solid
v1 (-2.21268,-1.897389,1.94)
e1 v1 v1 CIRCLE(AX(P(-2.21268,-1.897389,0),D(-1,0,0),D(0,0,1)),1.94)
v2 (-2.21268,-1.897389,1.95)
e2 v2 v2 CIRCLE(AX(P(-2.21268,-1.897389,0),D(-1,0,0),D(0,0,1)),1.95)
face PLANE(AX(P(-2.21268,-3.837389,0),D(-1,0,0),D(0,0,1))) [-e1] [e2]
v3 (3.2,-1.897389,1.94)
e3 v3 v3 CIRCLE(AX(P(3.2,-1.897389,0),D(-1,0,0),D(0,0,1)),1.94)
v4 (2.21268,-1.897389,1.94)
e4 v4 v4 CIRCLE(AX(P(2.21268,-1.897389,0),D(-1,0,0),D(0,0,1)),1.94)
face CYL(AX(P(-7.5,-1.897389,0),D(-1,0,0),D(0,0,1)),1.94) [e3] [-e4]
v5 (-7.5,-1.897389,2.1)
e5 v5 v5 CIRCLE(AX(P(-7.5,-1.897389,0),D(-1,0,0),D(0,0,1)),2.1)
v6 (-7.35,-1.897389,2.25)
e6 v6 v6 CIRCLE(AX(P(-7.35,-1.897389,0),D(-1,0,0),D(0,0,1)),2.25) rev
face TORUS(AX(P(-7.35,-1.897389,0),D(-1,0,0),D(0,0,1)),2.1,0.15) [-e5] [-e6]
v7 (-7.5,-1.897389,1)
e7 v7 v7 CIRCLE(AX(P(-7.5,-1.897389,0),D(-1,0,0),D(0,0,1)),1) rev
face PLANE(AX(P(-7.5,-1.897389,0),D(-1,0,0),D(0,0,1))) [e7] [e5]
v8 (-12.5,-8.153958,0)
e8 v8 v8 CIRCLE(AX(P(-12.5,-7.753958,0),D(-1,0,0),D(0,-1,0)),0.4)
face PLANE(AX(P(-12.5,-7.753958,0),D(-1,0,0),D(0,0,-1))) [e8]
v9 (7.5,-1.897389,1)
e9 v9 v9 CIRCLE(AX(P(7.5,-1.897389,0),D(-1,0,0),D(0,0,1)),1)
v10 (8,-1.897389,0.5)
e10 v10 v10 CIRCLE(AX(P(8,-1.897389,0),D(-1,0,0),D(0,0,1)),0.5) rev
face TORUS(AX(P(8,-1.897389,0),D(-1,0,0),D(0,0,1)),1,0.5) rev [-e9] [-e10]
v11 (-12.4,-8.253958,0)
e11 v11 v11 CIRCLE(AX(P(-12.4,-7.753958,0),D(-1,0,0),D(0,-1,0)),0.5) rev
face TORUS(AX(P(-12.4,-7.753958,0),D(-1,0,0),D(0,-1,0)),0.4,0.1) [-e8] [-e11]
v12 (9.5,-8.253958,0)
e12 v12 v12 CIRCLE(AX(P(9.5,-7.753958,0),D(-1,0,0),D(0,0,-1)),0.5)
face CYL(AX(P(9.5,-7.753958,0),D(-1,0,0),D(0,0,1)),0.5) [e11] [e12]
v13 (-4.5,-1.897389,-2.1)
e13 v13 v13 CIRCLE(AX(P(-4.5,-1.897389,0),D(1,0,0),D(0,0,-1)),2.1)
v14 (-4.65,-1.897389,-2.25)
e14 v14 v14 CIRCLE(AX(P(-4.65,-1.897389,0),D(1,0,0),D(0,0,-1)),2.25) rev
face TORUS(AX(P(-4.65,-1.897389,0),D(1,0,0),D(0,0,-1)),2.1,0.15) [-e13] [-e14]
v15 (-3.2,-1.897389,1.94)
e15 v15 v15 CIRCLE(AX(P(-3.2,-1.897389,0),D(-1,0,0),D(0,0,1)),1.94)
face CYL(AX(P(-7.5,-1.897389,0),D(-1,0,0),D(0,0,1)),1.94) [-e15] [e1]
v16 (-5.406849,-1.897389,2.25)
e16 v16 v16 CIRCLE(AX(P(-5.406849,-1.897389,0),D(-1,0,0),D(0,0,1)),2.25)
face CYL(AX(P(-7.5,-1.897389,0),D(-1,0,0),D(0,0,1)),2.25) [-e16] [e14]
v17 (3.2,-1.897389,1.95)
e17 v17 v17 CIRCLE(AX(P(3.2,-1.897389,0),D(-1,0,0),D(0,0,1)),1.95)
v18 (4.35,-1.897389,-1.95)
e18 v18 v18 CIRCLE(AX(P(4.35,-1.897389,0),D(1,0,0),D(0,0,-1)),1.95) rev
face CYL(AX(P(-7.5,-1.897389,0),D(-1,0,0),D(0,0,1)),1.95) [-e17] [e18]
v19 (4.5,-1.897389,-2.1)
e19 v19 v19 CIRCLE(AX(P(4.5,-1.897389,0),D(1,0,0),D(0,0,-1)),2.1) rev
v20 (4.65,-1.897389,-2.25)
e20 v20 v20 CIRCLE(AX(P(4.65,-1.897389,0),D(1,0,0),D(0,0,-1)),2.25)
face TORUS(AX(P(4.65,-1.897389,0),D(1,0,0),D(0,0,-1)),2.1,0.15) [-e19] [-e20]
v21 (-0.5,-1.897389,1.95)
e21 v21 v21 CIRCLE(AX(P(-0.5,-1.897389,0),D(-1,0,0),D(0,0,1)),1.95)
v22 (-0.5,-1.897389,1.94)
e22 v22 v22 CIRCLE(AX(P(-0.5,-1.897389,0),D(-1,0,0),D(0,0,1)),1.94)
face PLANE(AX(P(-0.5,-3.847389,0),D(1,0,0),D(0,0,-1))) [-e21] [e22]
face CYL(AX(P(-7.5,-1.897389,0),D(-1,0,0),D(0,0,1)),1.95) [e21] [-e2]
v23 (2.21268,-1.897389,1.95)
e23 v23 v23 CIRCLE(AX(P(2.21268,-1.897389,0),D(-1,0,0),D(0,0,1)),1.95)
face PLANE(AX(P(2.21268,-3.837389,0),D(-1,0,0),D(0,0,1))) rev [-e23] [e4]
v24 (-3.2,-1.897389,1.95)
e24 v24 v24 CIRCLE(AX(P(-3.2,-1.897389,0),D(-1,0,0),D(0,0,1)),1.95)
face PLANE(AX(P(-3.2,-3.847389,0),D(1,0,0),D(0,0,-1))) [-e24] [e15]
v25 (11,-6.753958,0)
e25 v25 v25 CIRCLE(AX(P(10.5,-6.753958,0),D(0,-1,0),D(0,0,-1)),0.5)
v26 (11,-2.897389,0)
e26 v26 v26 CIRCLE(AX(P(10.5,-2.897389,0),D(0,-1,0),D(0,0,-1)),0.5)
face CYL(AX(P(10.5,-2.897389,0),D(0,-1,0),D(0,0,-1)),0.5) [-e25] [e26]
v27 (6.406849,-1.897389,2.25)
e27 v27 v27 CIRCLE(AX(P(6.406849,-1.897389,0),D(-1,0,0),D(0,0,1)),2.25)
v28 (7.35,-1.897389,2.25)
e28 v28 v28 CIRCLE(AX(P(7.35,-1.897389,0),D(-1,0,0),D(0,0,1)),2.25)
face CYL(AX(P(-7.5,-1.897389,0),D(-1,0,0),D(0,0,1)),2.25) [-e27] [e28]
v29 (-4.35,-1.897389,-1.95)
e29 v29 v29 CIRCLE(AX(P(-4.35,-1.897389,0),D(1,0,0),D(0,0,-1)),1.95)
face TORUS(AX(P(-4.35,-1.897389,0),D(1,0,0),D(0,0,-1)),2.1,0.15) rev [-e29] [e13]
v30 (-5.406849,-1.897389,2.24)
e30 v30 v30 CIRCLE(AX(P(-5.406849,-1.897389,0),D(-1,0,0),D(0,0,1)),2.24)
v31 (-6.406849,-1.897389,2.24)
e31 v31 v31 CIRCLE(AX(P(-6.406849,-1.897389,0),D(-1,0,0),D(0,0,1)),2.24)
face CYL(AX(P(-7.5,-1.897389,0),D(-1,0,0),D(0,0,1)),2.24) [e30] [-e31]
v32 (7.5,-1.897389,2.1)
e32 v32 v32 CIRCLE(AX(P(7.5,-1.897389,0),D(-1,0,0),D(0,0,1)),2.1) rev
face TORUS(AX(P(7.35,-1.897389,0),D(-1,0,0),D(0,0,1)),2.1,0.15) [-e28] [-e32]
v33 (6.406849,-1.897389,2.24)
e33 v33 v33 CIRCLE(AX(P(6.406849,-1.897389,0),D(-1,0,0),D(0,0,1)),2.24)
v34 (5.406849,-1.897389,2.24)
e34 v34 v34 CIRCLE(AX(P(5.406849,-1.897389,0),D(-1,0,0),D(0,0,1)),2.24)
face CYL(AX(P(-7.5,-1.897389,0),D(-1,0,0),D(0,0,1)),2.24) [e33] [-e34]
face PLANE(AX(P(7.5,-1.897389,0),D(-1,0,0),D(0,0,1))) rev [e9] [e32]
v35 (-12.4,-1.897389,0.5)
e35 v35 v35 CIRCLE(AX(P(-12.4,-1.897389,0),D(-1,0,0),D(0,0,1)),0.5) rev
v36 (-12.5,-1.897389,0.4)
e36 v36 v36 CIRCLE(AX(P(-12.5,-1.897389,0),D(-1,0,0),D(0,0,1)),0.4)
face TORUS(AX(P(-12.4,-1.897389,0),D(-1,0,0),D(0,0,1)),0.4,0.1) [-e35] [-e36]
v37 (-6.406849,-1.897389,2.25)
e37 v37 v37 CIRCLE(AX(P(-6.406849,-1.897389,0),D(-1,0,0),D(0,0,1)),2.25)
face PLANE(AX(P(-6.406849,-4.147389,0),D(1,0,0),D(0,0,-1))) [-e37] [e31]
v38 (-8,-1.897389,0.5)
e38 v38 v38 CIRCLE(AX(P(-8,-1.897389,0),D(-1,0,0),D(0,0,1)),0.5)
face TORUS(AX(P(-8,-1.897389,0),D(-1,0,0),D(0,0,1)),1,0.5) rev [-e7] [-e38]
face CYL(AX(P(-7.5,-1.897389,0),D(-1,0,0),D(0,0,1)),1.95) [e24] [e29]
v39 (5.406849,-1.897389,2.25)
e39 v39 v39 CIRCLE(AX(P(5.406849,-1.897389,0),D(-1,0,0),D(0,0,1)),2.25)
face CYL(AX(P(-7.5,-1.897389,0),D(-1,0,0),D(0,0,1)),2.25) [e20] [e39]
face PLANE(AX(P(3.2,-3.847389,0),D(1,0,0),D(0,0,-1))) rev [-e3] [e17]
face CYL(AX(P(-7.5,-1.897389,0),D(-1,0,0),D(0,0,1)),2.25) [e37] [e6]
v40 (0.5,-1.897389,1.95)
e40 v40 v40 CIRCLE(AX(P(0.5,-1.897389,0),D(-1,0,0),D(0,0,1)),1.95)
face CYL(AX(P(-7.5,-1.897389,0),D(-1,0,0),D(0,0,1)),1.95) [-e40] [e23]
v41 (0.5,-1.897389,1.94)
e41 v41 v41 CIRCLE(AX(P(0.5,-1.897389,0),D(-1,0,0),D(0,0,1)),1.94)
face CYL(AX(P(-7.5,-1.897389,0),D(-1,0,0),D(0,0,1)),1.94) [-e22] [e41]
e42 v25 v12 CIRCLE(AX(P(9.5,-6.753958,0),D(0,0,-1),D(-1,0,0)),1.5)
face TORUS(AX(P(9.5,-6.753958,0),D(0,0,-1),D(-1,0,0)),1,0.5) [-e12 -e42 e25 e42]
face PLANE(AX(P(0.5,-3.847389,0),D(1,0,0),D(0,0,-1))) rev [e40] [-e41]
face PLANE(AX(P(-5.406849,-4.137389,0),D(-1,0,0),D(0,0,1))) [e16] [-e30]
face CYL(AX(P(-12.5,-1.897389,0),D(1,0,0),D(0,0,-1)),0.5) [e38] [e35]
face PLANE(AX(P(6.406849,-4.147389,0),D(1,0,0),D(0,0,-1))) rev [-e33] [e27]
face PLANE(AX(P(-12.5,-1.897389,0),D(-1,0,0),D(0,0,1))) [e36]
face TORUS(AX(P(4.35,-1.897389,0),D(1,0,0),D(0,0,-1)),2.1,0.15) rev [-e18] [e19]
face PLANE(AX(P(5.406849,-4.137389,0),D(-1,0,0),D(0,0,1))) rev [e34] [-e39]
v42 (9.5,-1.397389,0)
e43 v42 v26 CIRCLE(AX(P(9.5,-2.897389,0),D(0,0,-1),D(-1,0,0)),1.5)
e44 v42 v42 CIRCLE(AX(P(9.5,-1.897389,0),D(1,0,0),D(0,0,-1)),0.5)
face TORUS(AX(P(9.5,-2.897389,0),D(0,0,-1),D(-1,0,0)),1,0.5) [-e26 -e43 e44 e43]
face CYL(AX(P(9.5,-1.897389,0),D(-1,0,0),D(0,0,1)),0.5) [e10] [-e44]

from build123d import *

# Parameters (mm, degrees)
FILLET2_R = 0.15
FILLET3_R = 0.15
SKETCH3_R = 0.5
SKETCH5_R = 0.5
FILLET4_R = 0.1
FILLET5_R = 0.5


with BuildPart() as part:
    # Sketch1 → Revolve2 (revolve)
    with BuildSketch(Plane.XY, mode=Mode.PRIVATE) as revolve2_sk:
        Polygon((-7.5, -1.897389039), (7.5, -1.897389039), (7.5, -4.147389039), (6.406849222, -4.147389039), (6.406849222, -4.137389039), (5.406849222, -4.137389039), (5.406849222, -4.147389039), (4.5, -4.147389039), (4.5, -3.847389039), (3.2, -3.847389039), (3.2, -3.837389039), (2.212680485, -3.837389039), (2.212680485, -3.847389039), (0.5, -3.847389039), (0.5, -3.837389039), (-0.5, -3.837389039), (-0.5, -3.847389039), (-2.212680485, -3.847389039), (-2.212680485, -3.837389039), (-3.2, -3.837389039), (-3.2, -3.847389039), (-4.5, -3.847389039), (-4.5, -4.147389039), (-5.406849222, -4.147389039), (-5.406849222, -4.137389039), (-6.406849222, -4.137389039), (-6.406849222, -4.147389039), (-7.5, -4.147389039), align=None)
    revolve(revolve2_sk.sketch.rotate(Axis((-7.5, -1.897389039, 0), (1, 0, 0)), 270), axis=Axis((-7.5, -1.897389039, 0), (1, 0, 0)))

    # Fillet2
    fillet2_edges = [part.edges().sort_by_distance(p)[0] for p in [
        (-7.5, -1.897389039, -2.25),
        (7.5, -1.897389039, -2.25),
        (4.5, -1.897389039, -2.25),
        (-4.5, -1.897389039, -2.25),
    ]]
    fillet(fillet2_edges, radius=FILLET2_R)

    # Fillet3
    fillet3_edges = [part.edges().sort_by_distance(p)[0] for p in [
        (4.5, -1.897389039, -1.95),
        (-4.5, -1.897389039, -1.95),
    ]]
    fillet(fillet3_edges, radius=FILLET3_R - 0.0001)  # a hair under: the kernel refuses the full size

    # Sweep2: sweep along a curve in space
    with BuildLine() as sweep2_path:
        Line((7.5, -1.897389039, 0), (9.5, -1.897389039, 0))
        ThreePointArc((10.5, -2.897389039, 0), (10.207106781, -2.190282258, 0), (9.5, -1.897389039, 0))
        Line((10.5, -2.897389039, 0), (10.5, -6.753958043, 0))
        ThreePointArc((9.5, -7.753958043, 0), (10.207106781, -7.461064824, 0), (10.5, -6.753958043, 0))
        Line((9.5, -7.753958043, 0), (-12.5, -7.753958043, 0))
    # Sketch3 → Sweep2 (sweep)
    with BuildSketch(Plane(origin=(7.5, 0, 0), x_dir=(0, 0, -1), z_dir=(1, 0, 0))):
        with Locations((0, -1.897389039)):
            Circle(SKETCH3_R)
    sweep(path=sweep2_path.line)

    # Sweep3: sweep along a curve in space
    with BuildLine() as sweep3_path:
        Line((-7.5, -1.897389039, 0), (-12.5, -1.897389039, 0))
    # Sketch5 → Sweep3 (sweep)
    with BuildSketch(Plane.ZY.offset(7.5)):
        with Locations((0, -1.897389039)):
            Circle(SKETCH5_R)
    sweep(path=sweep3_path.line)

    # Fillet4
    fillet4_edges = [part.edges().sort_by_distance(p)[0] for p in [
        (-12.5, -7.753958043, 0.5),
        (-12.5, -1.897389039, -0.5),
    ]]
    fillet(fillet4_edges, radius=FILLET4_R)

    # Fillet5
    fillet5_edges = [part.edges().sort_by_distance(p)[0] for p in [
        (7.5, -1.897389039, 0.5),
        (-7.5, -1.897389039, -0.5),
    ]]
    fillet(fillet5_edges, radius=FILLET5_R)


solid = part.part
